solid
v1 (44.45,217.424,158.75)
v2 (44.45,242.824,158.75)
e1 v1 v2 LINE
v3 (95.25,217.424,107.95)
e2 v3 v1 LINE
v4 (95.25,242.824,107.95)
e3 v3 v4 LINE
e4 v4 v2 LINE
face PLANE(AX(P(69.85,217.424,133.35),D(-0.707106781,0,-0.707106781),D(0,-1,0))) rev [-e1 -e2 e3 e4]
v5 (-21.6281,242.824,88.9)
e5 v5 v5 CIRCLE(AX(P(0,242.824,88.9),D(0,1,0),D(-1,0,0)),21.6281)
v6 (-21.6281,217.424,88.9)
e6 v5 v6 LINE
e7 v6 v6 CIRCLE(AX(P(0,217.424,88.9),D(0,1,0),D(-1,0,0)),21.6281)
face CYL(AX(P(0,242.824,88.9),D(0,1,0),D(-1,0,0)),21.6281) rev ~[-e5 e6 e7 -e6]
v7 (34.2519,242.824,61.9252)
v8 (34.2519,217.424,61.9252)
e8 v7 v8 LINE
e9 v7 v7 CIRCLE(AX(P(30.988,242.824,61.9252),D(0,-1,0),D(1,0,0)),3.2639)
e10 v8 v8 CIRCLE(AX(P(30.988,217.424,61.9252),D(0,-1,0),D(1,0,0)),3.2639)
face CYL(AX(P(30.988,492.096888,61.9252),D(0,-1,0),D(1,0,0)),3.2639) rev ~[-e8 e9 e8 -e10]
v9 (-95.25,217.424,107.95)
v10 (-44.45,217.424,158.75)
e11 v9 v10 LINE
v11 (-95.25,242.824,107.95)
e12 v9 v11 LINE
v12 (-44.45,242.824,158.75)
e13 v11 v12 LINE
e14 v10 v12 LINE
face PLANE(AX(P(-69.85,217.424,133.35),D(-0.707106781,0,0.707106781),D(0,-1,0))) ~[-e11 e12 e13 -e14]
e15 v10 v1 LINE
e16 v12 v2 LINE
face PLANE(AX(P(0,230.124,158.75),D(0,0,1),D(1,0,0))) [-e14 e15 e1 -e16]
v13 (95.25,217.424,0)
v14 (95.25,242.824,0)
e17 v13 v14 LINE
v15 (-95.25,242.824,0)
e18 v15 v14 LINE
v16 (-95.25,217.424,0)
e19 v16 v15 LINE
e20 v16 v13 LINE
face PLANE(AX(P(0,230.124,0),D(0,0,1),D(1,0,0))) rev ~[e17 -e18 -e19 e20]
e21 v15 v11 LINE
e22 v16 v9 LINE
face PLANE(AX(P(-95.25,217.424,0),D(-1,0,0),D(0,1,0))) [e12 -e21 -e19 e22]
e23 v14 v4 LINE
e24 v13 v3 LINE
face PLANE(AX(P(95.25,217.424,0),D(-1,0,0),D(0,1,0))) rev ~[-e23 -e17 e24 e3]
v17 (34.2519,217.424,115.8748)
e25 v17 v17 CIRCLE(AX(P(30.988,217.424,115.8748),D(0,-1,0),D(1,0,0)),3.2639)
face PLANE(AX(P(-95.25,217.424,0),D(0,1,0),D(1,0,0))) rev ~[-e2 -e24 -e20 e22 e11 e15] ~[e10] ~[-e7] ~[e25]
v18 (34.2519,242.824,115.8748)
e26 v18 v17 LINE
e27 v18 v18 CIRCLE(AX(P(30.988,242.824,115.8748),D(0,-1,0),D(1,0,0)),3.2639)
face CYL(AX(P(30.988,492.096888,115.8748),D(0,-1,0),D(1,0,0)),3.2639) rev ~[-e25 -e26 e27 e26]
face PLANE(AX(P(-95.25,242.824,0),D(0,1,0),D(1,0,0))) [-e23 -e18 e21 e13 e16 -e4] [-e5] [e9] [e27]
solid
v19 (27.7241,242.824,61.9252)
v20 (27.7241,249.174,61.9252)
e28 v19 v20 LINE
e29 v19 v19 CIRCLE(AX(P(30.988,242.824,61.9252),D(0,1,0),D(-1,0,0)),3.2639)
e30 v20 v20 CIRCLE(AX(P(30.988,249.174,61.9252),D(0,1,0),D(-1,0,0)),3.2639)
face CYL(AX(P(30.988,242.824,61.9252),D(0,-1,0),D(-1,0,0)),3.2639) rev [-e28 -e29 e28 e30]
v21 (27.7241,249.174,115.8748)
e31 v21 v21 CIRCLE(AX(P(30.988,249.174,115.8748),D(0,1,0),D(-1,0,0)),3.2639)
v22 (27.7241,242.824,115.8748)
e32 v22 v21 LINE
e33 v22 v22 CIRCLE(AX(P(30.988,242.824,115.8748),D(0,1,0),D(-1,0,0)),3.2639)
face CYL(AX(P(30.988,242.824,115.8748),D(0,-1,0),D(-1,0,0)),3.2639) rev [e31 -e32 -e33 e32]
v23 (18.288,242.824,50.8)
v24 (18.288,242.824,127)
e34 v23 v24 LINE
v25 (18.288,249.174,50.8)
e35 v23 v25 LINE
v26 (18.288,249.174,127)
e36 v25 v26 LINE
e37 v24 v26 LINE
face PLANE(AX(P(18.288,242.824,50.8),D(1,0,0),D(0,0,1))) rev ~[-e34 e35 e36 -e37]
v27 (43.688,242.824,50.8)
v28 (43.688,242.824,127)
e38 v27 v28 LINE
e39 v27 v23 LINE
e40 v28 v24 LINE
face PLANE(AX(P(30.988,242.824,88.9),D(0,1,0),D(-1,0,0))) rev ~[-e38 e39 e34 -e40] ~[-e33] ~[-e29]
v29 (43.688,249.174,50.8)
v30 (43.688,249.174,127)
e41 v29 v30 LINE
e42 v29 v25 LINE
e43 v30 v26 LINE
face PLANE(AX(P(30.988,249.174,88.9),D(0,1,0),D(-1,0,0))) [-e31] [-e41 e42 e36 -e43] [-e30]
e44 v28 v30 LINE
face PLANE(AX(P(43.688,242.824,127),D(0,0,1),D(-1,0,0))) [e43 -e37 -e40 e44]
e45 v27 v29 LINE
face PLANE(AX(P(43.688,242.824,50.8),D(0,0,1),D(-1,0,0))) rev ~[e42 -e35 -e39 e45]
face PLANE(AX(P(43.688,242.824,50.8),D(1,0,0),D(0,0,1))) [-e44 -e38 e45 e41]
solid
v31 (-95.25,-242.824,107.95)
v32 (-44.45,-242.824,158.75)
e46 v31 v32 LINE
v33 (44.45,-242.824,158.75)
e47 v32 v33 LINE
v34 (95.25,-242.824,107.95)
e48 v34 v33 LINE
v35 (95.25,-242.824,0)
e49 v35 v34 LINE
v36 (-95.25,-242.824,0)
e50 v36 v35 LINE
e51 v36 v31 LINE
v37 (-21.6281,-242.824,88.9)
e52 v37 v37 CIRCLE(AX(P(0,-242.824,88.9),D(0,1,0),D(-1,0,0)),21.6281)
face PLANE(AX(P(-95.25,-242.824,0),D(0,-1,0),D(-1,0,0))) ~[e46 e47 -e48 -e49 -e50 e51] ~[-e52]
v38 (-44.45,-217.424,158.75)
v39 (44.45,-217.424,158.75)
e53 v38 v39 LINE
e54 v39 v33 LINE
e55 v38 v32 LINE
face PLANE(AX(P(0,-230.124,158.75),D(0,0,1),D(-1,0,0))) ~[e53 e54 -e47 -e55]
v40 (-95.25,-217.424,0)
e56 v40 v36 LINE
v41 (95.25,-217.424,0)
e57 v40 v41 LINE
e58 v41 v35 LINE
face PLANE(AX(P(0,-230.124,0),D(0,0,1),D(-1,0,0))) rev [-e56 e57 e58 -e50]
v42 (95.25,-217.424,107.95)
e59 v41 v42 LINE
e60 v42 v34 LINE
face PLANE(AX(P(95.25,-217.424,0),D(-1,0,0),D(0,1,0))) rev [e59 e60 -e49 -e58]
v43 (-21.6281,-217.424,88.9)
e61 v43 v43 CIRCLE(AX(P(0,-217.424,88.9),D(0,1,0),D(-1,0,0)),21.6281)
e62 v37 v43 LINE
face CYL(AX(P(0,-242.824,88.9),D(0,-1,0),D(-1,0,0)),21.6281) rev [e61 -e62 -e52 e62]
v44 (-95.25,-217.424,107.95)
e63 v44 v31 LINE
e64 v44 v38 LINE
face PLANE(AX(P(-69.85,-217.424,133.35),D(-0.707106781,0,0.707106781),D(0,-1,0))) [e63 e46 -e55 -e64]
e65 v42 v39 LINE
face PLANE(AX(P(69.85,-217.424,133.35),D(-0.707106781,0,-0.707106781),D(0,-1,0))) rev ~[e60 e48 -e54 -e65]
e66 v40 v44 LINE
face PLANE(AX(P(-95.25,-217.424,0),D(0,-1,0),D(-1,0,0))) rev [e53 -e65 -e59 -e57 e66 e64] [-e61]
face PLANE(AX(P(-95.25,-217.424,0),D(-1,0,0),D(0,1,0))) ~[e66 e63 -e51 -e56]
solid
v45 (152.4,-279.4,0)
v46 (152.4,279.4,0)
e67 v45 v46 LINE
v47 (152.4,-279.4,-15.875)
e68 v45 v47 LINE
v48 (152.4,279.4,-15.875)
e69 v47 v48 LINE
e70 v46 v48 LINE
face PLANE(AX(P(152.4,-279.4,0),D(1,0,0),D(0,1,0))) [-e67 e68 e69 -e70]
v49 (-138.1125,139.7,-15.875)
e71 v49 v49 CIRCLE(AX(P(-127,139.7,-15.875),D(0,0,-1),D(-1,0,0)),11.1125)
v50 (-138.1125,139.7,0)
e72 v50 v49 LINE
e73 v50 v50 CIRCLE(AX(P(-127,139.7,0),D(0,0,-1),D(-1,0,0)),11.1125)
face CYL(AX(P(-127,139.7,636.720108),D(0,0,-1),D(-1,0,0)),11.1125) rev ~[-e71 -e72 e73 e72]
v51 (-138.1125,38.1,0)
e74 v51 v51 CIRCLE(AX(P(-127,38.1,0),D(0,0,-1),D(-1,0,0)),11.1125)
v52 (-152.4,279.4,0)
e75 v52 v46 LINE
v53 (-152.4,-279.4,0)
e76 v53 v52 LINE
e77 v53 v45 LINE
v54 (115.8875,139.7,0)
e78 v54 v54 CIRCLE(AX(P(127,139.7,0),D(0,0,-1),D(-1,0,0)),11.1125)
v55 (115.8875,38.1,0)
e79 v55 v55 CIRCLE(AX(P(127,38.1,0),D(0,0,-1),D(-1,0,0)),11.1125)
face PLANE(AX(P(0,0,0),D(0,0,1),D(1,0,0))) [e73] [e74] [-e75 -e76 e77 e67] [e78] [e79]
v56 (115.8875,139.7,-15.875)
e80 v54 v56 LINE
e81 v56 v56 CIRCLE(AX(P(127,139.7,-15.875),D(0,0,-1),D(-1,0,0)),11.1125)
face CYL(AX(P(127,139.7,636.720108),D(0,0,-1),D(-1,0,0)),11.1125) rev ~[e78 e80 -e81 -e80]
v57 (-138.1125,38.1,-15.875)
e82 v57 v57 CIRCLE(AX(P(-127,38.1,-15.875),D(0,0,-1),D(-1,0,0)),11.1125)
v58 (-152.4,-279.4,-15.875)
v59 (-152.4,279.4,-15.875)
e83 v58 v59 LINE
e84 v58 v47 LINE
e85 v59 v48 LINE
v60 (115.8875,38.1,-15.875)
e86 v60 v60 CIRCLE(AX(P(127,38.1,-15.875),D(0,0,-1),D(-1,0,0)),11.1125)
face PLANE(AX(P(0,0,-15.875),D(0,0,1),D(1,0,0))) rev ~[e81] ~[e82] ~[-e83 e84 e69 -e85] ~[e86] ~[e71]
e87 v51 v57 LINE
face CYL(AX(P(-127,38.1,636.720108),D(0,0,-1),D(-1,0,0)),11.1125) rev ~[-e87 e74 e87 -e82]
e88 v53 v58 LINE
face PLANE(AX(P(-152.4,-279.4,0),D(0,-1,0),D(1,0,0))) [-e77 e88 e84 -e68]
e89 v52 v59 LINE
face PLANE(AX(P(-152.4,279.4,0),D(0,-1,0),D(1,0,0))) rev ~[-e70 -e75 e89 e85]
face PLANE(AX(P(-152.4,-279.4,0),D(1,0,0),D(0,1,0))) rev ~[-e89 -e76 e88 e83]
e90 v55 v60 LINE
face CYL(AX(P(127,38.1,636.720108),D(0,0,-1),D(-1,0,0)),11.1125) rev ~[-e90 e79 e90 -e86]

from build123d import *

# Parameters (mm, degrees)
F0_W      = 304.8
F0_H      = 558.8
F1_DEPTH  = 15.875
F3_D      = 22.225
F4_W      = 190.5
F4_H      = 25.4
F5_DEPTH  = 158.75
F6_SIZE   = 50.8
F8_R      = 21.6281
F9_DEPTH  = 522.225
F12_D     = 6.5278
F13_W     = 25.4
F13_H     = 76.2
F13_R     = 3.2639
F14_DEPTH = 6.35


# Not quite as in the source:
# - a length typed as a fraction of an inch, garbled in the dataset ("3 / 203.2 mm" for 3/8 in), is restored


with BuildPart() as f1:
    # F0 (on Top) → F1 (new body)
    with BuildSketch(Plane.XY):
        Rectangle(F0_W, F0_H)
    extrude(amount=-F1_DEPTH)

    # F3 (through all)
    with Locations(Plane.XY):
        with Locations((-127, 139.7), (127, 139.7), (127, 38.1), (-127, 38.1)):
            Hole(F3_D / 2)


with BuildPart() as f5:
    # F4 (on face) → F5 (new body)
    with BuildSketch(Plane.XY):
        with Locations((0, 230.124)):
            Rectangle(F4_W, F4_H)
    extrude(amount=F5_DEPTH)

    # F6
    f6_edges = [f5.edges().sort_by_distance(p)[0] for p in [
        (95.25, 230.124, 158.75),
        (-95.25, 230.124, 158.75),
    ]]
    chamfer(f6_edges, length=F6_SIZE)

    # F8 (on face) → F9 (cut, through all)
    with BuildSketch(Plane(origin=(0, 242.824, 0), x_dir=(-1, 0, 0), z_dir=(0, 1, 0))):
        with Locations((0, 88.9)):
            Circle(F8_R)
    extrude(amount=-F9_DEPTH, mode=Mode.SUBTRACT)


with BuildPart() as f10_1:
    # F10: instance of F5
    add(f5.part.mirror(Plane.XZ))


with BuildPart() as f5_1:
    add(f5.part)

    # F12 (through all)
    with Locations(Plane(origin=(0, 242.824, 0), x_dir=(-1, 0, 0), z_dir=(0, 1, 0))):
        with Locations((-30.988, 115.8748), (-30.988, 61.9252)):
            Hole(F12_D / 2)


with BuildPart() as f14:
    # F13 (on face) → F14 (new body)
    with BuildSketch(Plane(origin=(0, 242.824, 0), x_dir=(-1, 0, 0), z_dir=(0, 1, 0))):
        with Locations((-30.988, 88.9)):
            Rectangle(F13_W, F13_H)
        with Locations((-30.988, 61.9252)):
            Circle(F13_R, mode=Mode.SUBTRACT)
        with Locations((-30.988, 115.8748)):
            Circle(F13_R, mode=Mode.SUBTRACT)
    extrude(amount=F14_DEPTH)


solid = Compound([f1.part, f10_1.part, f5_1.part, f14.part])
